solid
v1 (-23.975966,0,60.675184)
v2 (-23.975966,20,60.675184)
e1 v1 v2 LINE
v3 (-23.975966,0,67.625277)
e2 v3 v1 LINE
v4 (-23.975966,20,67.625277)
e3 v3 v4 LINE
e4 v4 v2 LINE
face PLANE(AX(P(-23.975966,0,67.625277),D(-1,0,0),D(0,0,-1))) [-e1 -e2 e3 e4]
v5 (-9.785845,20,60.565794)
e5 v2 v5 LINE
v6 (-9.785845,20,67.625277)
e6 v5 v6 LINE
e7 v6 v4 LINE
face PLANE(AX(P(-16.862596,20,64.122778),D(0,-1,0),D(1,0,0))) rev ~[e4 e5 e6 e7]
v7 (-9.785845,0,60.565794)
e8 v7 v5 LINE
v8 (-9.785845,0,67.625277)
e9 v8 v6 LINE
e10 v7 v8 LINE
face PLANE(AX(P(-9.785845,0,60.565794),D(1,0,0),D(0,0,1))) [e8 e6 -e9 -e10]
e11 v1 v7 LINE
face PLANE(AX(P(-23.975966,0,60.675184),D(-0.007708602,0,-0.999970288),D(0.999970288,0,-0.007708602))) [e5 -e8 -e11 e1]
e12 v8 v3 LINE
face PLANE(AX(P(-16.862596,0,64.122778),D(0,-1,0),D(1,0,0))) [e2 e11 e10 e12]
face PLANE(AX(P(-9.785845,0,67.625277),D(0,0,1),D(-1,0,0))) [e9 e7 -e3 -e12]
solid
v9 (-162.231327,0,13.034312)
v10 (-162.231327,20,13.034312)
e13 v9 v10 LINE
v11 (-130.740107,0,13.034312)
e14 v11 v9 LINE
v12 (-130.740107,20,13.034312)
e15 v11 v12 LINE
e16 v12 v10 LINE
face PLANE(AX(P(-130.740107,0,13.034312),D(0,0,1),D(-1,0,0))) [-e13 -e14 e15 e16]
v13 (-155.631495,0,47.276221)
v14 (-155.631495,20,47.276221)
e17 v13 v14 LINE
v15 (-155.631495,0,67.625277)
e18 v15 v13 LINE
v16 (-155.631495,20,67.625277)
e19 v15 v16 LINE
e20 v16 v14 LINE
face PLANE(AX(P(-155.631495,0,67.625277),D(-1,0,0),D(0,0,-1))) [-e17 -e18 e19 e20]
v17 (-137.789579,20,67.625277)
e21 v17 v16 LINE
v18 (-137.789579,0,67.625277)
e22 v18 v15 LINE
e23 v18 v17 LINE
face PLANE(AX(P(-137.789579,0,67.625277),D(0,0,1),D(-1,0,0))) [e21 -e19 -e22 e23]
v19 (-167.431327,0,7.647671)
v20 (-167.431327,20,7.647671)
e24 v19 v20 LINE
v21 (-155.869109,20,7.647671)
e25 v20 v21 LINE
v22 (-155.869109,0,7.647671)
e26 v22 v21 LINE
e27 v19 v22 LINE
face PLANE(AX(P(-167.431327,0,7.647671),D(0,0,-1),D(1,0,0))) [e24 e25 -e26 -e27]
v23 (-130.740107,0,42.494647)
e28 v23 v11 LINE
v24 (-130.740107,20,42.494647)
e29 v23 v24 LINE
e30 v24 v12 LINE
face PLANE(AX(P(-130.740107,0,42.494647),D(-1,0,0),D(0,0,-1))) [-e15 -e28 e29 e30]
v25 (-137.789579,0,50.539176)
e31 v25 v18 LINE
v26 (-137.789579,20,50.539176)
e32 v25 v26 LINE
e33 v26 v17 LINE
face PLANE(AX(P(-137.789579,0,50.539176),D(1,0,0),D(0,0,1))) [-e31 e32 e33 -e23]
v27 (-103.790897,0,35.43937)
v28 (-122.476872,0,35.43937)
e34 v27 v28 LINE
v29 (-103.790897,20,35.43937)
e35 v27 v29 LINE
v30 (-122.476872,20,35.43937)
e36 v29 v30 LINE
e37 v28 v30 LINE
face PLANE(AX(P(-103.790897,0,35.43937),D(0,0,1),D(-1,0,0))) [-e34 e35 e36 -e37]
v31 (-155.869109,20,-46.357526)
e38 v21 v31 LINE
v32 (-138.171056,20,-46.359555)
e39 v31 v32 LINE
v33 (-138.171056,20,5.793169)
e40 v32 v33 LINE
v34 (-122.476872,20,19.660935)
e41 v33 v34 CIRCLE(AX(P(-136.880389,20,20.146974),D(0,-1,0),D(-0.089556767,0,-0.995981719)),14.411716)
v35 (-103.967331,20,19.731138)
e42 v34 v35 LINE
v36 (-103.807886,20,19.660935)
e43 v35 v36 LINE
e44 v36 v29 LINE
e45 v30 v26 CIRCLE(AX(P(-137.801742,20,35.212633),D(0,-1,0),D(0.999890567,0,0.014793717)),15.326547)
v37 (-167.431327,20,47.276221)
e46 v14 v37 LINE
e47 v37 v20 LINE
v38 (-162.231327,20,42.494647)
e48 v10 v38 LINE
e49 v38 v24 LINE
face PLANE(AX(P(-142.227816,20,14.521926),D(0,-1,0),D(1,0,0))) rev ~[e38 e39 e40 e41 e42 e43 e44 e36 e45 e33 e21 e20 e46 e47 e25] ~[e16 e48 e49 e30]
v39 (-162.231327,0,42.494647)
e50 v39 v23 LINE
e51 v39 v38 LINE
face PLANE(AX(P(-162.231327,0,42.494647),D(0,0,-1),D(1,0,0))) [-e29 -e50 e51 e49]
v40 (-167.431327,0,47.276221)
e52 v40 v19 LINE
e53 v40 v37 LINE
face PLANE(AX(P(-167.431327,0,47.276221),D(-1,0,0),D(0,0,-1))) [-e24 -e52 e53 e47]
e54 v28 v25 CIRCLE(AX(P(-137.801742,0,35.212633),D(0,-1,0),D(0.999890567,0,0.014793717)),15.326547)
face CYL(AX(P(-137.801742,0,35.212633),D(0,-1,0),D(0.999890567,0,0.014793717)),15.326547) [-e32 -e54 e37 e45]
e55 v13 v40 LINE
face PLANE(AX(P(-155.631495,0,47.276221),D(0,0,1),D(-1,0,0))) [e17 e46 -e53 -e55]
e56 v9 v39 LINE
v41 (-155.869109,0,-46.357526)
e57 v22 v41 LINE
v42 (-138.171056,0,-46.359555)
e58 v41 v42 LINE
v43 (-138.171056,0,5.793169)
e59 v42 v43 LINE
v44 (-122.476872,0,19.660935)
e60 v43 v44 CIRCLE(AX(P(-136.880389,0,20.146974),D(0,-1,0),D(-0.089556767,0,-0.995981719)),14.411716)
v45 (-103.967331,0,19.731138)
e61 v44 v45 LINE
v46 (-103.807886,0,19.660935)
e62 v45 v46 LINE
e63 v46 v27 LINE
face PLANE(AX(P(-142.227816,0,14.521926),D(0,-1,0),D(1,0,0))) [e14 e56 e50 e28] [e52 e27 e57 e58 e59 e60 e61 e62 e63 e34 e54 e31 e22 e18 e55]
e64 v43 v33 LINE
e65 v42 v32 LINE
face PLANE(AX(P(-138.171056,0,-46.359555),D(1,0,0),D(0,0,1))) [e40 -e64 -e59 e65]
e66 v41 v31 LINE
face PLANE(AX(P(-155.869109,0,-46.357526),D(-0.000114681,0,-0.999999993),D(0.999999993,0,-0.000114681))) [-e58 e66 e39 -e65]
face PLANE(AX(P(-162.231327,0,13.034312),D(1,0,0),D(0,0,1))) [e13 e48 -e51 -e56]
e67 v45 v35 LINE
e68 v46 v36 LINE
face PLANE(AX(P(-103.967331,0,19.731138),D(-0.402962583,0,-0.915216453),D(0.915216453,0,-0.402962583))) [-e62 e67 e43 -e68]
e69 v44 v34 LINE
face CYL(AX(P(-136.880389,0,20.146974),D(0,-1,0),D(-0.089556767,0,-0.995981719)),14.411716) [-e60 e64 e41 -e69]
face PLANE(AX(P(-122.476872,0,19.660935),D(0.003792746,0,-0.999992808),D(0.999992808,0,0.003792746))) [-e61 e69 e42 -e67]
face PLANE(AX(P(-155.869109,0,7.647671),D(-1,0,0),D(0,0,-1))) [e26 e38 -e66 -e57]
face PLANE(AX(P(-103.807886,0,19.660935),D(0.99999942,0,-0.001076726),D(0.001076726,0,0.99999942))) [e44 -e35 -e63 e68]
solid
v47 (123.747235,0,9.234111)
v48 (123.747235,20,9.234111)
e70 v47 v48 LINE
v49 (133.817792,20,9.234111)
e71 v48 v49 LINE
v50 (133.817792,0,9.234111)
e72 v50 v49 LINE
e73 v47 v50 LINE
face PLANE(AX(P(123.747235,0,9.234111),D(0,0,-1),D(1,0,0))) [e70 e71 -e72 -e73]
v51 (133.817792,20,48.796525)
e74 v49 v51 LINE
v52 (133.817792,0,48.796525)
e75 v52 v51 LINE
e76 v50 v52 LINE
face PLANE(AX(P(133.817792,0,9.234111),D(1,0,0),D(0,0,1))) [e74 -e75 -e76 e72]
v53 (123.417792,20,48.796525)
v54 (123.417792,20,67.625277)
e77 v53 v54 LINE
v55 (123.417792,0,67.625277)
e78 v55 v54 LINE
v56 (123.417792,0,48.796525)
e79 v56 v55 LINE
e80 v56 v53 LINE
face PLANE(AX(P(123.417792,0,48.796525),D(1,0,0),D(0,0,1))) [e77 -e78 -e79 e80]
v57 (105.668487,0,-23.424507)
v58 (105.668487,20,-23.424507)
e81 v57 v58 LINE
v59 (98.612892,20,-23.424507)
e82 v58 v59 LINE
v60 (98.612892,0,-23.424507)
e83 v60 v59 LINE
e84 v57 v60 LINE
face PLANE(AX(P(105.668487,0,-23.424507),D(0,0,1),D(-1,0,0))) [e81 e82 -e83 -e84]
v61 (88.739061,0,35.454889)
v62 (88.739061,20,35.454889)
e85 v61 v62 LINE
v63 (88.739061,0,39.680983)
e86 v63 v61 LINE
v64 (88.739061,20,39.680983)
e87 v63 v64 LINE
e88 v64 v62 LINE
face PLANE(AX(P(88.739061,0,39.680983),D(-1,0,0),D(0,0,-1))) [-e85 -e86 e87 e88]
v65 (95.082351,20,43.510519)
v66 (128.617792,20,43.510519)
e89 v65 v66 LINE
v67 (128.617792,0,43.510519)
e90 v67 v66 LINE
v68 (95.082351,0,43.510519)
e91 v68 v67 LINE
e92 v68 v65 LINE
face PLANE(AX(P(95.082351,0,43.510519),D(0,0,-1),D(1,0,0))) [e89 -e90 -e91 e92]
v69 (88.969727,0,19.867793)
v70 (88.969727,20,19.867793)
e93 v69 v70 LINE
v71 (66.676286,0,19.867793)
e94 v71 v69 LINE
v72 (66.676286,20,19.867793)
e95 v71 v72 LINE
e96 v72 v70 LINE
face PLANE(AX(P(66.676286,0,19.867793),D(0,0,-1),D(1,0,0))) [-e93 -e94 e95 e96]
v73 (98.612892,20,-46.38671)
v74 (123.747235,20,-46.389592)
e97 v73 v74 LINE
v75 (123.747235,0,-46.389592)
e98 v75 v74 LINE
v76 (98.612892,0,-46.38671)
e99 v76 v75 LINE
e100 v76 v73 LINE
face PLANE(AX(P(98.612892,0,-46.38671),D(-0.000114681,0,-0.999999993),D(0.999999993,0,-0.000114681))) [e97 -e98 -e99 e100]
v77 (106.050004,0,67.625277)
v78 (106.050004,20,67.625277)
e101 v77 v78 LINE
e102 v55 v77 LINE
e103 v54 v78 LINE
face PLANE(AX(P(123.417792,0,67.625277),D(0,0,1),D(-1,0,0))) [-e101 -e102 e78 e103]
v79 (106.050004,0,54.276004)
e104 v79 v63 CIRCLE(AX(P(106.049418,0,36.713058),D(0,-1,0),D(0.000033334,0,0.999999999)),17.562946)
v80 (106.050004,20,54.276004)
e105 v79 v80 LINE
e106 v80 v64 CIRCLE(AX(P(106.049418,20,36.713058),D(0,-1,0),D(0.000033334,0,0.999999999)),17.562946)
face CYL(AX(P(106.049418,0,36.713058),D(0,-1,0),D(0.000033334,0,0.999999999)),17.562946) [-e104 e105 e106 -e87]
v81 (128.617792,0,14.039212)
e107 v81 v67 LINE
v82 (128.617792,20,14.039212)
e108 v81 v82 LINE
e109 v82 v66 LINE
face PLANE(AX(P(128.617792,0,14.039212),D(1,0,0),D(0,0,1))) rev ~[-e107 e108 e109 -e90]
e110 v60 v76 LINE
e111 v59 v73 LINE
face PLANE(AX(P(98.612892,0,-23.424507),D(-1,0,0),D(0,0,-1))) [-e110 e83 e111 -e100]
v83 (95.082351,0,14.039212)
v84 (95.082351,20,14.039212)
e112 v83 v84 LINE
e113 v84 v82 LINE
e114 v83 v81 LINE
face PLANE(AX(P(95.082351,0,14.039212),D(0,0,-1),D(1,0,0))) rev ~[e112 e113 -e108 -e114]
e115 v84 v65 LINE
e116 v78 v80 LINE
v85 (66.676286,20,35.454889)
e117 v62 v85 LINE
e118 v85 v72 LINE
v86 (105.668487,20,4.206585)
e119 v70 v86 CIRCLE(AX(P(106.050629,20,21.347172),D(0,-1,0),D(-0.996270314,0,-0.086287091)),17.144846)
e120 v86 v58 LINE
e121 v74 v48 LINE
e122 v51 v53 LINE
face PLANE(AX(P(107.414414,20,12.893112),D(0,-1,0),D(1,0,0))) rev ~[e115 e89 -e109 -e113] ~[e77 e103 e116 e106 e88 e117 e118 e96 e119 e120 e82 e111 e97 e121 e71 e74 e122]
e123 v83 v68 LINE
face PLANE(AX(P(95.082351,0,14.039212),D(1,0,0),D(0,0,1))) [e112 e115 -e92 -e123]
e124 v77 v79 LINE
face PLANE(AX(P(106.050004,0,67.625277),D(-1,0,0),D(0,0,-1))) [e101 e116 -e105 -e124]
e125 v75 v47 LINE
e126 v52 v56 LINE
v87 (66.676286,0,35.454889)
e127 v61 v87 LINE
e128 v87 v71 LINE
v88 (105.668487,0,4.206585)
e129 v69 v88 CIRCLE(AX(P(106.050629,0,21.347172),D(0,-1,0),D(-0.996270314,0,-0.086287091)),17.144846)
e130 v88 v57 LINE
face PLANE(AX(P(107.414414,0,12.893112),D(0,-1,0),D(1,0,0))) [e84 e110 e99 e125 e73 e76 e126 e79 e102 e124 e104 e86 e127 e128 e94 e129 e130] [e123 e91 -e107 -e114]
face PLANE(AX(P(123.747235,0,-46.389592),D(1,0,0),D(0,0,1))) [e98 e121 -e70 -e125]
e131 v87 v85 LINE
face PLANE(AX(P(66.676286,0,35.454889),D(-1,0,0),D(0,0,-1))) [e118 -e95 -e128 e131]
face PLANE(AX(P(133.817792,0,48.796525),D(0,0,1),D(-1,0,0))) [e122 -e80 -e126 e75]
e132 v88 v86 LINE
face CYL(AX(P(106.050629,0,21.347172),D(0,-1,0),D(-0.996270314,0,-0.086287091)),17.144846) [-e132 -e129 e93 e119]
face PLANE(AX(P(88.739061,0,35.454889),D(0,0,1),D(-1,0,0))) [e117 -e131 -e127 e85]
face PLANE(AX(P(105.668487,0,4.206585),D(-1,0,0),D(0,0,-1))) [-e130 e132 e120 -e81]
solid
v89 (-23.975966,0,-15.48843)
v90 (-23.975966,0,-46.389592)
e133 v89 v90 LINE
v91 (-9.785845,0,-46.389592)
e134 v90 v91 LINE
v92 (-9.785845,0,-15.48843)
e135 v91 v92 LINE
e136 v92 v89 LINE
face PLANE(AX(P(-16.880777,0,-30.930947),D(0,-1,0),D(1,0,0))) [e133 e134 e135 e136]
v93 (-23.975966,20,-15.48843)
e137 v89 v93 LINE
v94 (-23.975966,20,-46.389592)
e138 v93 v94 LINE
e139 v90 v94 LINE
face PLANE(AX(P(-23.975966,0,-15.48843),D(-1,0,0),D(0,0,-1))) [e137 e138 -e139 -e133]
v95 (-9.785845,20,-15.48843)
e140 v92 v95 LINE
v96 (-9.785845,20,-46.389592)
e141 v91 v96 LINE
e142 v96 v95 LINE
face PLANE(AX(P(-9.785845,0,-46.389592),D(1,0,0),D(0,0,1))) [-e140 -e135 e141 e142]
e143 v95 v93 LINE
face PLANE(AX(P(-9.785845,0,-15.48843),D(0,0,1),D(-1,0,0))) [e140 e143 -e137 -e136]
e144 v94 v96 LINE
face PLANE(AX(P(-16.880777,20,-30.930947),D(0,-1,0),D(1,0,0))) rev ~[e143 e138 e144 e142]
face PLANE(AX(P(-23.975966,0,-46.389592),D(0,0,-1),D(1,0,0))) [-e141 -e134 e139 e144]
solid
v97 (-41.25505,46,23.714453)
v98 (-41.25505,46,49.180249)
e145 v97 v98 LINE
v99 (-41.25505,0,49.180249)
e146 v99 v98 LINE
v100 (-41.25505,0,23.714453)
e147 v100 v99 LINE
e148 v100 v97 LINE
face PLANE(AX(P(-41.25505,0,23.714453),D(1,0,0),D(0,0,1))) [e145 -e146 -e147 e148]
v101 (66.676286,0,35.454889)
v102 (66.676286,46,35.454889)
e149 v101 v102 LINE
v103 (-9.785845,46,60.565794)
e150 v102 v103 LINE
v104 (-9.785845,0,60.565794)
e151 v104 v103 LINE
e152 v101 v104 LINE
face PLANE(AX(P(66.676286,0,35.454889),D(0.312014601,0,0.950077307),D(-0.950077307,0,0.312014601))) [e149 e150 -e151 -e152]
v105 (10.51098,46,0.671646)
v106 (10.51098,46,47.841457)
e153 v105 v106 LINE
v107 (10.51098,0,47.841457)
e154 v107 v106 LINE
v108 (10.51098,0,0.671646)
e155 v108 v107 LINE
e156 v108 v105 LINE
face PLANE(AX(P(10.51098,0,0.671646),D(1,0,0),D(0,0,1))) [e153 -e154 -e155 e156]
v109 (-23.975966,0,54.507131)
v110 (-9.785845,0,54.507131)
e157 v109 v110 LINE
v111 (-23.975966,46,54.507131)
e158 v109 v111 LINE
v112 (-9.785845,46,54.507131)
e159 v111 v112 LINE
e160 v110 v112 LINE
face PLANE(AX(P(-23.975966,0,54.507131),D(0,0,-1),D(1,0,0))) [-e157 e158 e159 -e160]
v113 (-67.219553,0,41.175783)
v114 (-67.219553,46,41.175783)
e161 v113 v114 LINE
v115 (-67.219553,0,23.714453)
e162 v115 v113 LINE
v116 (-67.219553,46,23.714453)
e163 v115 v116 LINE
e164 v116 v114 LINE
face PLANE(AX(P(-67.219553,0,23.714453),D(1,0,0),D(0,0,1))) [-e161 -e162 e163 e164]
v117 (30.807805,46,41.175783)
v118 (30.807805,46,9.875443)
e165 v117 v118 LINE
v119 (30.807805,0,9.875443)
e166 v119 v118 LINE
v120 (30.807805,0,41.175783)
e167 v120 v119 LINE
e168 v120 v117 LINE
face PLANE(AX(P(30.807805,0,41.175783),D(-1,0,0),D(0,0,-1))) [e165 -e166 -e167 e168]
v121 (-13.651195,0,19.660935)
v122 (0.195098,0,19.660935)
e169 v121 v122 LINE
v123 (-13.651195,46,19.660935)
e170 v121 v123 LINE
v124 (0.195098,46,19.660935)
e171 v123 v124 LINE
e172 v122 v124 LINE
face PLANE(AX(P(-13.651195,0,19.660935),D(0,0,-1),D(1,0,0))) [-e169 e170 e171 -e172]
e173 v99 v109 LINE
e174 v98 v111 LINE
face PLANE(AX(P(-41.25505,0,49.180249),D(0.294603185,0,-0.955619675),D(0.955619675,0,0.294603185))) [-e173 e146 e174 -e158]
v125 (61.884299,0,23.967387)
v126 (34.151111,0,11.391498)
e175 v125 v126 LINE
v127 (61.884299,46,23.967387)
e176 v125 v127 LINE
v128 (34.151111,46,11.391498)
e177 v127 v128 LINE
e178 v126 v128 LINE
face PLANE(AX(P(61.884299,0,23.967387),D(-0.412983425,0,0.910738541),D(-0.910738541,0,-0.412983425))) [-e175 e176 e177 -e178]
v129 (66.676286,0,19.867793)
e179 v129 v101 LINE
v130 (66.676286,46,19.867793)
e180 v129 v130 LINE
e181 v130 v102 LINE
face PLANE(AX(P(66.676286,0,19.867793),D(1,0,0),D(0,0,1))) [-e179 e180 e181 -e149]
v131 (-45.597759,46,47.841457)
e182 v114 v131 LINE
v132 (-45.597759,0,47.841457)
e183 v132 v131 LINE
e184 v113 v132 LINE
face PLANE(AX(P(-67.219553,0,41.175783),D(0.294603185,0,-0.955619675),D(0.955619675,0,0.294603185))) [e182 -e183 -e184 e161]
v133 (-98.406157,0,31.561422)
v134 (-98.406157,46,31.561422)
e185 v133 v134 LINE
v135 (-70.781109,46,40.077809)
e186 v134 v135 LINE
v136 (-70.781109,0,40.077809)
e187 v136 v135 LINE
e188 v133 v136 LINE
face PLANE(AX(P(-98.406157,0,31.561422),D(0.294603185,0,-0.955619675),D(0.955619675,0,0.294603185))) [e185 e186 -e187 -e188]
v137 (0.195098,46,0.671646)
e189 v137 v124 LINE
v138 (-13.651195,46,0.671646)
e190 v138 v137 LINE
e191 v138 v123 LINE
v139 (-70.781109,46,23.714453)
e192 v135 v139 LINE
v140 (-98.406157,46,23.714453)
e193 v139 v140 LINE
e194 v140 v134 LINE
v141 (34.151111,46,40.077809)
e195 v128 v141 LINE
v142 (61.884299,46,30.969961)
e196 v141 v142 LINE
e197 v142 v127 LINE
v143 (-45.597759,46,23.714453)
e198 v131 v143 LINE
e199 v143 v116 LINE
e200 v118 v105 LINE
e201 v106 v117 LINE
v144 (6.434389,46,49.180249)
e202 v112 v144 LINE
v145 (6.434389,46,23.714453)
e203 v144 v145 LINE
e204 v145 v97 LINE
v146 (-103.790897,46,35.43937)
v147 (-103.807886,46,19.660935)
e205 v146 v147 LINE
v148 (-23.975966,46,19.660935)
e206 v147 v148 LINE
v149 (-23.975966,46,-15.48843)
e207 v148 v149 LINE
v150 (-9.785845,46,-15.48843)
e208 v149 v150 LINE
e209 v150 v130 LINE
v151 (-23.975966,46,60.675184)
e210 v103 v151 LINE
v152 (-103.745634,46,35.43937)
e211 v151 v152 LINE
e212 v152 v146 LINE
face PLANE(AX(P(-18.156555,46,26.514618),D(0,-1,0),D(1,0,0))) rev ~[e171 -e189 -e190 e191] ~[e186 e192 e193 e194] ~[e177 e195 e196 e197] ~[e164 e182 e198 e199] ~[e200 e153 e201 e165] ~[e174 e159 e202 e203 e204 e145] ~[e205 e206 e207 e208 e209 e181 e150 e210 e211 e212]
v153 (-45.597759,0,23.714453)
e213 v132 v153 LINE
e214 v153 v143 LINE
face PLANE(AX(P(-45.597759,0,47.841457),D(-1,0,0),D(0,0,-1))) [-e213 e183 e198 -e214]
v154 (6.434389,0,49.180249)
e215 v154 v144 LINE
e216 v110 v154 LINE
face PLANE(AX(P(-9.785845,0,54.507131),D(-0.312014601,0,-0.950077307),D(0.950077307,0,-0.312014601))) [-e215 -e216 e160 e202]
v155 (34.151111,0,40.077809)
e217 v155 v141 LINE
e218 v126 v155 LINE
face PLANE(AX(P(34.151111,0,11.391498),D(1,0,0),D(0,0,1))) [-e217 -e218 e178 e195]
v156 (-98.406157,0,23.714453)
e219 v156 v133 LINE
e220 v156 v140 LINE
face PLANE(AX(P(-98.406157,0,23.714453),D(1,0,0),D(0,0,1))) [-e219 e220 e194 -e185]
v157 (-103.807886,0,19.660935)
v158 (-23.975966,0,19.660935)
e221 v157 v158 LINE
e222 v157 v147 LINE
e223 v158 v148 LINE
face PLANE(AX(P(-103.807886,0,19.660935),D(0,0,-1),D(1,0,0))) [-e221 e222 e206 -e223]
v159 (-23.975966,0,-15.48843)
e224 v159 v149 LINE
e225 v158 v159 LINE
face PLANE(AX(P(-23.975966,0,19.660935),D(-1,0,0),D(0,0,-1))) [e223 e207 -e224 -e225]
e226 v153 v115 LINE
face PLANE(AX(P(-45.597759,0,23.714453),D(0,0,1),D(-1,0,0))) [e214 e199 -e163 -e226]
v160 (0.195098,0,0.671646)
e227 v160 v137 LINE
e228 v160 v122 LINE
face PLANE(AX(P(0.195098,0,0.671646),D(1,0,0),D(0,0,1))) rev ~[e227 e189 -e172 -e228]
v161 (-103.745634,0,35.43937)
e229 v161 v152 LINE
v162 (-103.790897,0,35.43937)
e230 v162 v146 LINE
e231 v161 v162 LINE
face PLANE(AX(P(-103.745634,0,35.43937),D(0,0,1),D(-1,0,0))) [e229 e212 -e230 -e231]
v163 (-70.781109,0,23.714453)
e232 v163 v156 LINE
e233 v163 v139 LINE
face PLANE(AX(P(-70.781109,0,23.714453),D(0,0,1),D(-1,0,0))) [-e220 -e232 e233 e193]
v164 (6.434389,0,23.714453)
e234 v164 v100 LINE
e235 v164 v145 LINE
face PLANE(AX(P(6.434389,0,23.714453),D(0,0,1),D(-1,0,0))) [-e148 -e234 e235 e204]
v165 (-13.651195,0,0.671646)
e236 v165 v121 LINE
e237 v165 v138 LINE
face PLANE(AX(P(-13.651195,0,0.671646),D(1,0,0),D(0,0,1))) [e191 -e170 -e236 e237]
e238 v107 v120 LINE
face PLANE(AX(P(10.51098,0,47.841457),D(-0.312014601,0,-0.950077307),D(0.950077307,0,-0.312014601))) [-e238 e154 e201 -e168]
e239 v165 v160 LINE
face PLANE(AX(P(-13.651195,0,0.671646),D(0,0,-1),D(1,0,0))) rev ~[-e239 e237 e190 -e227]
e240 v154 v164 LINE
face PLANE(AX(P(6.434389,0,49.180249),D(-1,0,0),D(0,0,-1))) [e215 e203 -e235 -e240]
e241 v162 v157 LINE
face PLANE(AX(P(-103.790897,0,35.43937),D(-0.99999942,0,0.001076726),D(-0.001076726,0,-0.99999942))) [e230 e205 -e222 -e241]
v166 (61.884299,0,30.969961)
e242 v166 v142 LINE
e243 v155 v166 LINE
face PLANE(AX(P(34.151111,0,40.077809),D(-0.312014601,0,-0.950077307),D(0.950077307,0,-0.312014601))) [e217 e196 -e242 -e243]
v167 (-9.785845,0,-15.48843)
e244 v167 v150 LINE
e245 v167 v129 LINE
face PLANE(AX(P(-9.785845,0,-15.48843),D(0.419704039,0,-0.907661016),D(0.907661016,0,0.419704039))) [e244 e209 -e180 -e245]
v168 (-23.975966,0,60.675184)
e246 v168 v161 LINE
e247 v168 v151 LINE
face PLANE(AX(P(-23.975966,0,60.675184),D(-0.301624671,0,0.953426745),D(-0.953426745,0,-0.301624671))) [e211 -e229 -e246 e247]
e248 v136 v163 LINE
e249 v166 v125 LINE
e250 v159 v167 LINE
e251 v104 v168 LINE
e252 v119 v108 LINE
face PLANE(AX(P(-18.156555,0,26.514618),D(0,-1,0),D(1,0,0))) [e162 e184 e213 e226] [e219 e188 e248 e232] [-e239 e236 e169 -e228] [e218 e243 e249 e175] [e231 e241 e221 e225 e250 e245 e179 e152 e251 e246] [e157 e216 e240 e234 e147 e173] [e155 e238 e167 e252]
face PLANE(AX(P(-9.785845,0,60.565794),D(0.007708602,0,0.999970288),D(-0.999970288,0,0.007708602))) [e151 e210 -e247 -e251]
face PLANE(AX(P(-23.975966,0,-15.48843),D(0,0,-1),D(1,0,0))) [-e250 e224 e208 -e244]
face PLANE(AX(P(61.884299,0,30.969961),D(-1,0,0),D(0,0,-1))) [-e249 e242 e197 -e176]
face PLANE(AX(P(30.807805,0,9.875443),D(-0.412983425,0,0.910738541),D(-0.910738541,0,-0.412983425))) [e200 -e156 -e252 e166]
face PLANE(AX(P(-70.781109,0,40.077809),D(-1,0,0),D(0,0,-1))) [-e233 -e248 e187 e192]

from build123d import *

# Parameters (mm, degrees)
F1_DEPTH = 20
F0_W     = 33.5354409566
F0_H     = 29.4713070616
F0_W_2   = 13.8462930918
F0_H_2   = 18.9892888787
F2_DEPTH = 46


# Not quite as in the source:
# - a feature names something its author has since deleted; it is built from what else it names


with BuildPart() as f1:
    # F0 (on Front) → F1 (new body)
    with BuildSketch(Plane.XZ):
        with BuildLine():
            Line((-155.6314946512, 67.6252768617), (-155.6314946512, 47.2762209197))
            Line((-155.6314946512, 47.2762209197), (-167.4313265361, 47.2762209197))
            Line((-167.4313265361, 47.2762209197), (-167.4313265361, 7.6476708777))
            Line((-167.4313265361, 7.6476708777), (-155.8691086427, 7.6476708777))
            Line((-155.8691086427, 7.6476708777), (-155.8691086427, -46.3575256138))
            Line((-155.8691086427, -46.3575256138), (-138.1710558739, -46.3595552359))
            Line((-138.1710558739, -46.3595552359), (-138.1710558739, 5.7931691183))
            ThreePointArc((-138.1710558739, 5.7931691183), (-127.3375674722, 9.3473401396), (-122.4768718044, 19.6609350621))
            Line((-122.4768718044, 19.6609350621), (-103.9673313431, 19.7311375442))
            Line((-103.9673313431, 19.7311375442), (-103.8078861008, 19.6609350621))
            Line((-103.8078861008, 19.6609350621), (-103.7908970378, 35.4393695202))
            Line((-103.7908970378, 35.4393695202), (-122.4768718044, 35.4393695202))
            ThreePointArc((-122.4768718044, 35.4393695202), (-127.0403675747, 46.1257386332), (-137.7895793309, 50.5391755124))
            Line((-137.7895793309, 50.5391755124), (-137.7895793309, 67.6252768617))
            Line((-137.7895793309, 67.6252768617), (-155.6314946512, 67.6252768617))
        make_face()
        Polygon((-154.9718528986, 42.4946472049), (-130.7401065387, 42.4946472049), (-130.7401065387, 13.0343120545), (-162.2313265361, 13.0343120545), (-162.2313265361, 35.5673134327), (-162.2313265361, 42.4946472049), align=None, mode=Mode.SUBTRACT)
    extrude(amount=-F1_DEPTH)


with BuildPart() as f1b:
    # F0 (on Front) → F1, piece 2 (new body)
    with BuildSketch(Plane.XZ):
        Polygon((-9.785844778, -15.4884296749), (-23.9759656186, -15.4884296749), (-23.9759656186, -46.3726511895), (-9.785844778, -46.3742785201), align=None)
        Polygon((-9.785844778, -46.3742785201), (-23.9759656186, -46.3726511895), (-23.9759656186, -46.3895921645), (-9.785844778, -46.3895921645), align=None)
    extrude(amount=-F1_DEPTH)


with BuildPart() as f1c:
    # F0 (on Front) → F1, piece 3 (new body)
    with BuildSketch(Plane.XZ):
        Polygon((-23.9759656186, 67.6252768617), (-23.9759656186, 60.675183593), (-9.785844778, 60.5657943495), (-9.785844778, 67.6252768617), align=None)
    extrude(amount=-F1_DEPTH)


with BuildPart() as f1d:
    # F0 (on Front) → F1, piece 4 (new body)
    with BuildSketch(Plane.XZ):
        with BuildLine():
            Line((88.7390607463, 35.4548891909), (66.6762858462, 35.4548891909))
            Line((66.6762858462, 35.4548891909), (66.6762858462, 19.8677930884))
            Line((66.6762858462, 19.8677930884), (88.9697274822, 19.8677930884))
            ThreePointArc((88.9697274822, 19.8677930884), (94.3221237474, 8.8416564285), (105.6684866268, 4.2065852498))
            Line((105.6684866268, 4.2065852498), (105.6684866268, -23.4245071926))
            Line((105.6684866268, -23.4245071926), (98.6128924986, -23.4245071926))
            Line((98.6128924986, -23.4245071926), (98.6128924986, -25.1669372239))
            Line((98.6128924986, -25.1669372239), (98.6128924986, -46.3867097448))
            Line((98.6128924986, -46.3867097448), (123.7472345797, -46.3895921645))
            Line((123.7472345797, -46.3895921645), (123.7472345797, -42.8738521096))
            Line((123.7472345797, -42.8738521096), (123.7472345797, 9.2341114881))
            Line((123.7472345797, 9.2341114881), (133.8177919388, 9.2341114881))
            Line((133.8177919388, 9.2341114881), (133.8177919388, 48.7965246565))
            Line((133.8177919388, 48.7965246565), (123.4177919388, 48.7965246565))
            Line((123.4177919388, 48.7965246565), (123.4177919388, 67.6252768617))
            Line((123.4177919388, 67.6252768617), (106.0500037662, 67.6252768617))
            Line((106.0500037662, 67.6252768617), (106.0500037662, 54.2760035917))
            ThreePointArc((106.0500037662, 54.2760035917), (94.7286096073, 50.1405055605), (88.7390607463, 39.6809829085))
            Line((88.7390607463, 39.6809829085), (88.7390607463, 35.4548891909))
        make_face()
        with Locations((111.8500714605, 28.7748654373)):
            Rectangle(F0_W, F0_H, mode=Mode.SUBTRACT)
    extrude(amount=-F1_DEPTH)


with BuildPart() as f2:
    # F0 (on Front) → F2 (new body)
    with BuildSketch(Plane.XZ):
        Polygon((-103.745634354, 35.4393695202), (-103.7908970378, 35.4393695202), (-103.8078861008, 19.6609350621), (-89.1917004483, 19.6609350621), (-23.9759656186, 19.6609350621), (-23.9759656186, -15.4884296749), (-9.785844778, -15.4884296749), (66.6762858462, 19.8677930884), (66.6762858462, 35.4548891909), (-9.785844778, 60.5657943495), (-23.9759656186, 60.675183593), align=None)
        with Locations((-6.7280486905, 10.1662906227)):
            Rectangle(F0_W_2, F0_H_2, mode=Mode.SUBTRACT)
        Polygon((-70.7811092775, 23.7144525419), (-98.4061571746, 23.7144525419), (-98.4061571746, 31.5614215695), (-70.7811092775, 40.0778087067), align=None, mode=Mode.SUBTRACT)
        Polygon((-67.2195533208, 23.7144525419), (-67.2195533208, 41.1757828876), (-45.5977594697, 47.841457015), (-45.5977594697, 23.7144525419), align=None, mode=Mode.SUBTRACT)
        Polygon((-41.2550495299, 49.1802492303), (-23.9759656186, 54.5071311424), (-9.785844778, 54.5071311424), (6.4343885435, 49.1802492303), (6.4343885435, 23.7144525419), (-41.2550495299, 23.7144525419), align=None, mode=Mode.SUBTRACT)
        Polygon((10.5109801516, 47.841457015), (30.8078050811, 41.1757828876), (30.8078050811, 9.8754427638), (10.5109801516, 0.6716461834), align=None, mode=Mode.SUBTRACT)
        Polygon((34.1511112947, 40.0778087067), (61.8842991005, 30.9699608995), (61.8842991005, 23.9673872123), (34.1511112947, 11.3914981273), align=None, mode=Mode.SUBTRACT)
    extrude(amount=-F2_DEPTH)


solid = Compound([f1.part, f1b.part, f1c.part, f1d.part, f2.part])
